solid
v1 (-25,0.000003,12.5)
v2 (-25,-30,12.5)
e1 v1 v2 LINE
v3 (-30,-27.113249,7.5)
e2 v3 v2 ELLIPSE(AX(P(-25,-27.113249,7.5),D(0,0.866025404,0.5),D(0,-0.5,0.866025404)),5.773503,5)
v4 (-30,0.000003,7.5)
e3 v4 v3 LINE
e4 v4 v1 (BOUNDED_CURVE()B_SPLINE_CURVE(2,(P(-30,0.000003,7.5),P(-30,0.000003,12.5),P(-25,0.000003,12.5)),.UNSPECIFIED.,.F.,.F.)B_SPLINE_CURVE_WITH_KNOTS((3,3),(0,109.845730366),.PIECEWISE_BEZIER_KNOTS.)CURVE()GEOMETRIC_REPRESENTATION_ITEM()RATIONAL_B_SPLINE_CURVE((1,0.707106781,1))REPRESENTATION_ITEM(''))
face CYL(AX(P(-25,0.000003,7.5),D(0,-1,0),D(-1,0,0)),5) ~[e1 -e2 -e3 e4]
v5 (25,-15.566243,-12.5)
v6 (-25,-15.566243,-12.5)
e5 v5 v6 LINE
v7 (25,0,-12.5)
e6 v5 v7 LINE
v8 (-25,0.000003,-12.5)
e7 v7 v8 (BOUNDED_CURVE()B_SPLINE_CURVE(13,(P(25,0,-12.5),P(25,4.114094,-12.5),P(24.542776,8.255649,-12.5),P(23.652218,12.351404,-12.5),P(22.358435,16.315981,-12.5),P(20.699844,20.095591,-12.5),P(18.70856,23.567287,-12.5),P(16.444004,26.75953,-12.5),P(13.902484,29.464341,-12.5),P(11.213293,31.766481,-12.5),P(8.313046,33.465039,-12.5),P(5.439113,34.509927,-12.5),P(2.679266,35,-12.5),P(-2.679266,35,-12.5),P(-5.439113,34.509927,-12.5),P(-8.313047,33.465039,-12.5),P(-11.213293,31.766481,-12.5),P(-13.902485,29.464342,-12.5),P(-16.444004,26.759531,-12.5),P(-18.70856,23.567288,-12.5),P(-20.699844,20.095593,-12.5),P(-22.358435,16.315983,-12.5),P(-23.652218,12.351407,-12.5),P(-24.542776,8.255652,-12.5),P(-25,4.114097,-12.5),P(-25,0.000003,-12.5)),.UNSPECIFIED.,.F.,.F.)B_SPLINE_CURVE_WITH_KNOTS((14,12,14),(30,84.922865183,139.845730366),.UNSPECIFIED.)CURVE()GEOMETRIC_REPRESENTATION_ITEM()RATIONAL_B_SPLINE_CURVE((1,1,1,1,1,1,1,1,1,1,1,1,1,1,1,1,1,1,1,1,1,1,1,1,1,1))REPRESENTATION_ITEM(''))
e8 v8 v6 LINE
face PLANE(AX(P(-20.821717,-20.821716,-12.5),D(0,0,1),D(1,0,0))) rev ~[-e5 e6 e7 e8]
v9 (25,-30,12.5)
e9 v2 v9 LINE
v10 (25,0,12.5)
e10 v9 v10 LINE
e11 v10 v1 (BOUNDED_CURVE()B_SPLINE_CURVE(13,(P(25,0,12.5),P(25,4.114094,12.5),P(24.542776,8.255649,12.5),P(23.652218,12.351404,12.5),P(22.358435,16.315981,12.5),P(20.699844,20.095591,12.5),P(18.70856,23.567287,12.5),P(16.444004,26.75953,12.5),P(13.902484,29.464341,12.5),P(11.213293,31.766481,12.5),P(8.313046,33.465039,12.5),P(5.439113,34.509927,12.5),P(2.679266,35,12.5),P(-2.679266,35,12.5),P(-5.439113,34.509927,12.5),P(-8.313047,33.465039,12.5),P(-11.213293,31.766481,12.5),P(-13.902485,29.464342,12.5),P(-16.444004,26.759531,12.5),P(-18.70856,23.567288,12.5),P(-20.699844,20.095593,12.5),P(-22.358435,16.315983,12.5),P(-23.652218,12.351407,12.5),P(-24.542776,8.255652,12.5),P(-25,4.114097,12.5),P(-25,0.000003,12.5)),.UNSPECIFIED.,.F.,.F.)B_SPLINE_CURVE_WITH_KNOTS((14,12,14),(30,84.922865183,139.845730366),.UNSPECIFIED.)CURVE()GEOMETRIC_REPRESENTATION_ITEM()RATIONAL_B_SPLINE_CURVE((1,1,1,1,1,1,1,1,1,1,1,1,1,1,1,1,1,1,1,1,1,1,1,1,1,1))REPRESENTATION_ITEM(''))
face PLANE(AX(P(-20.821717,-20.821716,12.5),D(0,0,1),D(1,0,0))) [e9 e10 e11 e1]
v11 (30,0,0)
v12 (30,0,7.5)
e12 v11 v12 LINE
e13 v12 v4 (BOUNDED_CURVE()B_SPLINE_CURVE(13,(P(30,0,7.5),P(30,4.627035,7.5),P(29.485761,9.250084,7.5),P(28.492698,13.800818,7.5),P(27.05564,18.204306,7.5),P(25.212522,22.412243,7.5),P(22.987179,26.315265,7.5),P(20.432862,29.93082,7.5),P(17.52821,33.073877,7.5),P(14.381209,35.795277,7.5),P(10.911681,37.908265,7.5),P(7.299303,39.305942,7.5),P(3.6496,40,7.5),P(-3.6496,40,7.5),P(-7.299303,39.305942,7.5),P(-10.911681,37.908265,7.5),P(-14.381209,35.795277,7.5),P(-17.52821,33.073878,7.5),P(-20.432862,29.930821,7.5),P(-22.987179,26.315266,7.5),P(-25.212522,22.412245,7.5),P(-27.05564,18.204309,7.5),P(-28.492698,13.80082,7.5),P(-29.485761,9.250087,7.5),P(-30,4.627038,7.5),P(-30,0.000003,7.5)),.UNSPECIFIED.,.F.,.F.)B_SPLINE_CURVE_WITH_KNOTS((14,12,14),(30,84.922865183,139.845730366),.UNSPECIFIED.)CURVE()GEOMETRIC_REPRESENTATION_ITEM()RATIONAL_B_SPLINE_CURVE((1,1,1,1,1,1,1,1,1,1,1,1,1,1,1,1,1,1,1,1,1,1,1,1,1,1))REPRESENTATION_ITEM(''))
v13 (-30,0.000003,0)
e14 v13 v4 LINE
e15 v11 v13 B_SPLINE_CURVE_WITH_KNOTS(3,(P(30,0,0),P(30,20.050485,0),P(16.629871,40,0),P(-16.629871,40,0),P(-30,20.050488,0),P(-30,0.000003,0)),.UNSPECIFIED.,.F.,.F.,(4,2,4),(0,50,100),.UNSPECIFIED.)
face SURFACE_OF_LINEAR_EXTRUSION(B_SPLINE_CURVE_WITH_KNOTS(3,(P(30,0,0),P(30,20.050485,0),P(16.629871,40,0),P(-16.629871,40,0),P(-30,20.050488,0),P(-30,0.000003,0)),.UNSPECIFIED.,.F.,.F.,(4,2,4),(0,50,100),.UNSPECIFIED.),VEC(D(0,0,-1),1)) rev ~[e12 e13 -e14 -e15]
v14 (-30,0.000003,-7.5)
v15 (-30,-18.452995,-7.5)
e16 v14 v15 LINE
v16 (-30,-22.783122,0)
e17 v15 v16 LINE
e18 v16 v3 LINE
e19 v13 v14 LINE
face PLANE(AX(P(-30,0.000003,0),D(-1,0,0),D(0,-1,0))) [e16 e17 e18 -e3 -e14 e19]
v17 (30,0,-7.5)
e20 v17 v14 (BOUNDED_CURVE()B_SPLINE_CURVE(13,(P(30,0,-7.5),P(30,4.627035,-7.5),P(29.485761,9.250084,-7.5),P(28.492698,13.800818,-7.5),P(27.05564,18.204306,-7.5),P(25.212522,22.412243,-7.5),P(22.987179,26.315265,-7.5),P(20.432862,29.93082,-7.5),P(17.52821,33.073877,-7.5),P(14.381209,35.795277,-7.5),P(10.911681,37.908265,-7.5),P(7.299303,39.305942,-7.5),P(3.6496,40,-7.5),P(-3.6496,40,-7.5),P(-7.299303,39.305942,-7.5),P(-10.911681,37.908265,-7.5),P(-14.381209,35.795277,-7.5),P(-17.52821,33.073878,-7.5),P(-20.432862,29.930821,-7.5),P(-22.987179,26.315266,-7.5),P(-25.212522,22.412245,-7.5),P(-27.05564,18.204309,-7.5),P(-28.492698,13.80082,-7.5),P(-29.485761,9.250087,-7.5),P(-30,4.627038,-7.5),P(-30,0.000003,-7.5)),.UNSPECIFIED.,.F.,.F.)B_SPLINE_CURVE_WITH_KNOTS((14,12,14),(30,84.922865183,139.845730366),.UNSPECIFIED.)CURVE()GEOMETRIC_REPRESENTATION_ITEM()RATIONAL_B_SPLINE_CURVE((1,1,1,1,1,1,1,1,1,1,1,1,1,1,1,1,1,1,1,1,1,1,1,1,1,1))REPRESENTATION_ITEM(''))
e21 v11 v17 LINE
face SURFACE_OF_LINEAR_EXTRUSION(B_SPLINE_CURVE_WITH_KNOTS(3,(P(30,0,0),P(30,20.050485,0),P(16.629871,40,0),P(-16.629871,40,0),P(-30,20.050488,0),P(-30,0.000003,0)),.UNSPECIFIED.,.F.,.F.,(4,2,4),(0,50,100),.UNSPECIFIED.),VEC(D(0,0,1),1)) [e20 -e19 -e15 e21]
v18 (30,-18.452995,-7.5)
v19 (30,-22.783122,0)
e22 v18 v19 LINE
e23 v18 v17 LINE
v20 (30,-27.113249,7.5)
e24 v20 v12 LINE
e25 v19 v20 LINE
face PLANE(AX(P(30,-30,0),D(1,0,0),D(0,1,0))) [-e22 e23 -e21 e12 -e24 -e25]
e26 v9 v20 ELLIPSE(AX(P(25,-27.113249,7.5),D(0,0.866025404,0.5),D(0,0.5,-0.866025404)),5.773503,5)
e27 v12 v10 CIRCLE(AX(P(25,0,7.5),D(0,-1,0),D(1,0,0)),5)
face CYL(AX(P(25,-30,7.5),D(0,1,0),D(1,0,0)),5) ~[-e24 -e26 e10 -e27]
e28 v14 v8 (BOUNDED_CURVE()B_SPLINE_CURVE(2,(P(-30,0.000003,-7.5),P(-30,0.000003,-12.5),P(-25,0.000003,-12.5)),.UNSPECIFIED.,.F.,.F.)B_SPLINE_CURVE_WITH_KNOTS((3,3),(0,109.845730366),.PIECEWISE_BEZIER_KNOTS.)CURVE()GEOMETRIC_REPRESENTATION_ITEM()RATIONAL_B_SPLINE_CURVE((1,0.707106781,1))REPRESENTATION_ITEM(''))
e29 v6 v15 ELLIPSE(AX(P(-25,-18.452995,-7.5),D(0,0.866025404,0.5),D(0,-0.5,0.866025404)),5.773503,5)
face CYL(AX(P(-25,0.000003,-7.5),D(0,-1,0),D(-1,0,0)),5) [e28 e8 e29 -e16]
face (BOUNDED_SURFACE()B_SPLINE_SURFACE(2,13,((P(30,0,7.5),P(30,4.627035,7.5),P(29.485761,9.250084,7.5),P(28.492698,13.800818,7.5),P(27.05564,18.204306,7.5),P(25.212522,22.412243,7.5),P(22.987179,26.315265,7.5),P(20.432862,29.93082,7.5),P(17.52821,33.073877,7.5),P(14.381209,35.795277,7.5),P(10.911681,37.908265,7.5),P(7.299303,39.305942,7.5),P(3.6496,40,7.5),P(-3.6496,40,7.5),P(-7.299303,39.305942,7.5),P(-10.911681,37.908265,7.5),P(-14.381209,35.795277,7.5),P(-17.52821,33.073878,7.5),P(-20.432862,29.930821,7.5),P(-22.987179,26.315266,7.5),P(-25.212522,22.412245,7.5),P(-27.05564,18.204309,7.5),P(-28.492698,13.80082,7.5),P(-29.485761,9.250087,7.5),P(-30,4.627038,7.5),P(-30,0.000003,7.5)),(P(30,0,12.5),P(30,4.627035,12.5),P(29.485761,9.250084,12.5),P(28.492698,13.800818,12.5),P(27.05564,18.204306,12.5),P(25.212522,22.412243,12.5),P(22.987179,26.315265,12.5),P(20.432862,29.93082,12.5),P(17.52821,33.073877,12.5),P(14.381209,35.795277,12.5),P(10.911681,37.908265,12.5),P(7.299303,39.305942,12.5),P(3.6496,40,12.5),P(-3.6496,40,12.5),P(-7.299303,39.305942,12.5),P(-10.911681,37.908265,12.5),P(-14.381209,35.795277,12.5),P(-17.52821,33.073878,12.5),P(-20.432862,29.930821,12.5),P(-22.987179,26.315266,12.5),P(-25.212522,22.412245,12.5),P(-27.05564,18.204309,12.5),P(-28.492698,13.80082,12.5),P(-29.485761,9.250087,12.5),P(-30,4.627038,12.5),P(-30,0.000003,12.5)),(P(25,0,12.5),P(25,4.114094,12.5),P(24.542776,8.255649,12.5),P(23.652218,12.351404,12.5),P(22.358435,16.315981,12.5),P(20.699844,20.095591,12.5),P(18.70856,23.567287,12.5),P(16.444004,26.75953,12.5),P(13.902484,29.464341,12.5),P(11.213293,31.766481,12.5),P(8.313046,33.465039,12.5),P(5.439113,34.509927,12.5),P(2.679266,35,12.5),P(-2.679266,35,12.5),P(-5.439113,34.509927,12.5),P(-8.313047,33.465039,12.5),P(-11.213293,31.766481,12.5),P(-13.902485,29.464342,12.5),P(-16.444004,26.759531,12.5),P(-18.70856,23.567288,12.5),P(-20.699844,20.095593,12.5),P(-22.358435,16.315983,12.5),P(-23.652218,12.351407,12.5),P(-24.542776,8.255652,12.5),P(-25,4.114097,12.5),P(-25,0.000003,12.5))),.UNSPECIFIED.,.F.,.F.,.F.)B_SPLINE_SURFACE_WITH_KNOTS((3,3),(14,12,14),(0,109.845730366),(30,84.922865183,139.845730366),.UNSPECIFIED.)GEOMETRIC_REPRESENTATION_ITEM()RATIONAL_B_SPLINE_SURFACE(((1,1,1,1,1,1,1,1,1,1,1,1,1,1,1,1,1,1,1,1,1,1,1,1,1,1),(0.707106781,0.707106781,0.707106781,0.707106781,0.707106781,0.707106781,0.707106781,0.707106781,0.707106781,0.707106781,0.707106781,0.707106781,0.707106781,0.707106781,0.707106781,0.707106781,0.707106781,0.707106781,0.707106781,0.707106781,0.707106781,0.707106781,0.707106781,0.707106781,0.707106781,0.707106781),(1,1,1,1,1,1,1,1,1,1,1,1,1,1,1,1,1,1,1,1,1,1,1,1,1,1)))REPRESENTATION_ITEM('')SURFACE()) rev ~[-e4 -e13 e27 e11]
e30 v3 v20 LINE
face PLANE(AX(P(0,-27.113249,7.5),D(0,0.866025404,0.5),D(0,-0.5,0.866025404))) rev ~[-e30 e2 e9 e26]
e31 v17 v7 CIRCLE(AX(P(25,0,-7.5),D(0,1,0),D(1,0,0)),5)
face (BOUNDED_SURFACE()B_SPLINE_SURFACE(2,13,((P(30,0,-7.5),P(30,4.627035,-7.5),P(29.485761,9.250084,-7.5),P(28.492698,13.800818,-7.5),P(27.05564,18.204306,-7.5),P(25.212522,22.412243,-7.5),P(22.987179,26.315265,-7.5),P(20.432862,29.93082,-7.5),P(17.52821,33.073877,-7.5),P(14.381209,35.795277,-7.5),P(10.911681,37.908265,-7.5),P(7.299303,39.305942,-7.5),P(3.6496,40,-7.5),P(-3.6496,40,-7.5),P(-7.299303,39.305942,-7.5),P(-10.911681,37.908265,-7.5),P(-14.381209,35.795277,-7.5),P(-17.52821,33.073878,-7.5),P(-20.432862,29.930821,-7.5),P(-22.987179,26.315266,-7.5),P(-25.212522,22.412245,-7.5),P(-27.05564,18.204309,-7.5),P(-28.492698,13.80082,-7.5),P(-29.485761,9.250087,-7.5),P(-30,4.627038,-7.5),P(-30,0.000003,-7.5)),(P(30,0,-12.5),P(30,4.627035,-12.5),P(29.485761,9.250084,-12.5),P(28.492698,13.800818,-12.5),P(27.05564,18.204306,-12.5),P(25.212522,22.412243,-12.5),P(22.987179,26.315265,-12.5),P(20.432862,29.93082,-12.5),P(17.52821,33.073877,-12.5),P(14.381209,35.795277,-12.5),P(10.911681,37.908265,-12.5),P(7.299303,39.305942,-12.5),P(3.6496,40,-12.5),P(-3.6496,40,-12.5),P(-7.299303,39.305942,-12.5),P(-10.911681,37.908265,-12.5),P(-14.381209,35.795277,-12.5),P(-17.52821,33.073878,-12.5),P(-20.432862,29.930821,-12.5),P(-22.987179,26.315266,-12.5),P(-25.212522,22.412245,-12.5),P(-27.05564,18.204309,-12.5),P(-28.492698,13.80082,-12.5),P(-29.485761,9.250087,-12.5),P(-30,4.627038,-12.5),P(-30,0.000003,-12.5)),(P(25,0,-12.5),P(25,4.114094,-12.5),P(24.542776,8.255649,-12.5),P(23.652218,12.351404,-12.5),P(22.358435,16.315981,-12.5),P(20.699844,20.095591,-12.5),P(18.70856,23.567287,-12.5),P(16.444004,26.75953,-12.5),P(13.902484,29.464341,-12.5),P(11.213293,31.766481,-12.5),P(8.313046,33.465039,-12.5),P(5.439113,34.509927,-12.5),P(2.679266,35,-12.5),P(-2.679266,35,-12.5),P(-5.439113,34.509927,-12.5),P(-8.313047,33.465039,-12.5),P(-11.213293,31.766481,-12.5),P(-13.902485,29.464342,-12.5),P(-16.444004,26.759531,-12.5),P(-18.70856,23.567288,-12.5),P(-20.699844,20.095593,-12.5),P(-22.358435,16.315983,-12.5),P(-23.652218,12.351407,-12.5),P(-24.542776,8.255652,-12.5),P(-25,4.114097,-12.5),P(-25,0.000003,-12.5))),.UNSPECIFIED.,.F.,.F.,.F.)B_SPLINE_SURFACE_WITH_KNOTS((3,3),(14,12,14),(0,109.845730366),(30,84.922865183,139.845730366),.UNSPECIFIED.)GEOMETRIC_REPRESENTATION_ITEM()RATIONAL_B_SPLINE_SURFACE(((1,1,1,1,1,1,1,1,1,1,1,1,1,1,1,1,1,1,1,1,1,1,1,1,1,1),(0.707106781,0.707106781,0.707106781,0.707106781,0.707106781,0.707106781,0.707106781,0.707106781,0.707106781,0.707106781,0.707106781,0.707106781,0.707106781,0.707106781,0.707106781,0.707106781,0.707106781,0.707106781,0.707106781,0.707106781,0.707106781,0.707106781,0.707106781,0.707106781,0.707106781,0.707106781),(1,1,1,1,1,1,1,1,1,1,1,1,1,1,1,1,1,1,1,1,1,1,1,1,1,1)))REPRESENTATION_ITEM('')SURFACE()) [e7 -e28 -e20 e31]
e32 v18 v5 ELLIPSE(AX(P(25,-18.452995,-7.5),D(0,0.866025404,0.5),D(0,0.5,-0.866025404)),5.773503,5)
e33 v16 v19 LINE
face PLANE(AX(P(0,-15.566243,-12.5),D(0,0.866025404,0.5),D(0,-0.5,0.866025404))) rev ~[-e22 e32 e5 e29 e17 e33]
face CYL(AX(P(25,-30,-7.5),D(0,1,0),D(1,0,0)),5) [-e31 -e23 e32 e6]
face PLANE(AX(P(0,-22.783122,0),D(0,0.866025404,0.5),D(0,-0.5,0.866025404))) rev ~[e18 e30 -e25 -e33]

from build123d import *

# Parameters (mm, degrees)
F1_DEPTH = 12.5
F2_R     = 5
F4_DEPTH = 30


with BuildPart() as f1:
    # F0 (on Top) → F1 (new body, symmetric)
    with BuildSketch(Plane.XY):
        with BuildLine():
            Line((-30, 2.9789e-06), (-30, -30))
            Line((-30, -30), (0, -30))
            ThreePointArc((0, -30), (-21.2132044888, -21.2132023824), (-30, 2.9789e-06))
        make_face()
        with BuildLine():
            ThreePointArc((30, 0), (21.2132034356, -21.2132034356), (0, -30))
            Line((0, -30), (30, -30))
            Line((30, -30), (30, 0))
        make_face()
        with BuildLine():
            ThreePointArc((-30, 2.9789e-06), (-21.2132044888, -21.2132023824), (0, -30))
            ThreePointArc((0, -30), (21.2132034356, -21.2132034356), (30, 0))
            ThreePointArc((30, 0), (1.4895e-06, 30), (-30, 2.9789e-06))
        make_face()
        with BuildLine():
            add(Edge.make_bspline(
                [(0, 40), (-16.629870981, 40), (-30, 20.0504878896), (-30, 2.9789e-06)],
                knots=[0, 0, 0, 0, 49.9999976168, 49.9999976168, 49.9999976168, 49.9999976168], degree=3))
            ThreePointArc((-30, 2.9789e-06), (1.4895e-06, 30), (30, 0))
            add(Edge.make_bspline(
                [(0, 40), (16.629870981, 40), (30, 20.0504849106), (30, 0)],
                knots=[0, 0, 0, 0, 50, 50, 50, 50], degree=3))
        make_face()
    extrude(amount=F1_DEPTH, both=True)

    # F2
    f2_edges = [f1.edges().sort_by_distance(p)[0] for p in [
        (30, -15, -12.5),
        (30, -15, 12.5),
        (-30, -14.999999, 12.5),
        (-30, -14.999999, -12.5),
    ]]
    fillet(f2_edges, radius=F2_R)

    # F3 (on Right) → F4 (cut, symmetric)
    with BuildSketch(Plane.YZ):
        Polygon((-15.5662432703, -12.5), (-22.7831216351, 0), (-30, 0), (-30, -12.5), align=None)
        Polygon((-30, 0), (-22.7831216351, 0), (-27.1132486541, 7.5), (-30, 7.5), align=None)
        Polygon((-30, 7.5), (-27.1132486541, 7.5), (-30, 12.5), align=None)
    extrude(amount=F4_DEPTH, both=True, mode=Mode.SUBTRACT)


solid = f1.part
